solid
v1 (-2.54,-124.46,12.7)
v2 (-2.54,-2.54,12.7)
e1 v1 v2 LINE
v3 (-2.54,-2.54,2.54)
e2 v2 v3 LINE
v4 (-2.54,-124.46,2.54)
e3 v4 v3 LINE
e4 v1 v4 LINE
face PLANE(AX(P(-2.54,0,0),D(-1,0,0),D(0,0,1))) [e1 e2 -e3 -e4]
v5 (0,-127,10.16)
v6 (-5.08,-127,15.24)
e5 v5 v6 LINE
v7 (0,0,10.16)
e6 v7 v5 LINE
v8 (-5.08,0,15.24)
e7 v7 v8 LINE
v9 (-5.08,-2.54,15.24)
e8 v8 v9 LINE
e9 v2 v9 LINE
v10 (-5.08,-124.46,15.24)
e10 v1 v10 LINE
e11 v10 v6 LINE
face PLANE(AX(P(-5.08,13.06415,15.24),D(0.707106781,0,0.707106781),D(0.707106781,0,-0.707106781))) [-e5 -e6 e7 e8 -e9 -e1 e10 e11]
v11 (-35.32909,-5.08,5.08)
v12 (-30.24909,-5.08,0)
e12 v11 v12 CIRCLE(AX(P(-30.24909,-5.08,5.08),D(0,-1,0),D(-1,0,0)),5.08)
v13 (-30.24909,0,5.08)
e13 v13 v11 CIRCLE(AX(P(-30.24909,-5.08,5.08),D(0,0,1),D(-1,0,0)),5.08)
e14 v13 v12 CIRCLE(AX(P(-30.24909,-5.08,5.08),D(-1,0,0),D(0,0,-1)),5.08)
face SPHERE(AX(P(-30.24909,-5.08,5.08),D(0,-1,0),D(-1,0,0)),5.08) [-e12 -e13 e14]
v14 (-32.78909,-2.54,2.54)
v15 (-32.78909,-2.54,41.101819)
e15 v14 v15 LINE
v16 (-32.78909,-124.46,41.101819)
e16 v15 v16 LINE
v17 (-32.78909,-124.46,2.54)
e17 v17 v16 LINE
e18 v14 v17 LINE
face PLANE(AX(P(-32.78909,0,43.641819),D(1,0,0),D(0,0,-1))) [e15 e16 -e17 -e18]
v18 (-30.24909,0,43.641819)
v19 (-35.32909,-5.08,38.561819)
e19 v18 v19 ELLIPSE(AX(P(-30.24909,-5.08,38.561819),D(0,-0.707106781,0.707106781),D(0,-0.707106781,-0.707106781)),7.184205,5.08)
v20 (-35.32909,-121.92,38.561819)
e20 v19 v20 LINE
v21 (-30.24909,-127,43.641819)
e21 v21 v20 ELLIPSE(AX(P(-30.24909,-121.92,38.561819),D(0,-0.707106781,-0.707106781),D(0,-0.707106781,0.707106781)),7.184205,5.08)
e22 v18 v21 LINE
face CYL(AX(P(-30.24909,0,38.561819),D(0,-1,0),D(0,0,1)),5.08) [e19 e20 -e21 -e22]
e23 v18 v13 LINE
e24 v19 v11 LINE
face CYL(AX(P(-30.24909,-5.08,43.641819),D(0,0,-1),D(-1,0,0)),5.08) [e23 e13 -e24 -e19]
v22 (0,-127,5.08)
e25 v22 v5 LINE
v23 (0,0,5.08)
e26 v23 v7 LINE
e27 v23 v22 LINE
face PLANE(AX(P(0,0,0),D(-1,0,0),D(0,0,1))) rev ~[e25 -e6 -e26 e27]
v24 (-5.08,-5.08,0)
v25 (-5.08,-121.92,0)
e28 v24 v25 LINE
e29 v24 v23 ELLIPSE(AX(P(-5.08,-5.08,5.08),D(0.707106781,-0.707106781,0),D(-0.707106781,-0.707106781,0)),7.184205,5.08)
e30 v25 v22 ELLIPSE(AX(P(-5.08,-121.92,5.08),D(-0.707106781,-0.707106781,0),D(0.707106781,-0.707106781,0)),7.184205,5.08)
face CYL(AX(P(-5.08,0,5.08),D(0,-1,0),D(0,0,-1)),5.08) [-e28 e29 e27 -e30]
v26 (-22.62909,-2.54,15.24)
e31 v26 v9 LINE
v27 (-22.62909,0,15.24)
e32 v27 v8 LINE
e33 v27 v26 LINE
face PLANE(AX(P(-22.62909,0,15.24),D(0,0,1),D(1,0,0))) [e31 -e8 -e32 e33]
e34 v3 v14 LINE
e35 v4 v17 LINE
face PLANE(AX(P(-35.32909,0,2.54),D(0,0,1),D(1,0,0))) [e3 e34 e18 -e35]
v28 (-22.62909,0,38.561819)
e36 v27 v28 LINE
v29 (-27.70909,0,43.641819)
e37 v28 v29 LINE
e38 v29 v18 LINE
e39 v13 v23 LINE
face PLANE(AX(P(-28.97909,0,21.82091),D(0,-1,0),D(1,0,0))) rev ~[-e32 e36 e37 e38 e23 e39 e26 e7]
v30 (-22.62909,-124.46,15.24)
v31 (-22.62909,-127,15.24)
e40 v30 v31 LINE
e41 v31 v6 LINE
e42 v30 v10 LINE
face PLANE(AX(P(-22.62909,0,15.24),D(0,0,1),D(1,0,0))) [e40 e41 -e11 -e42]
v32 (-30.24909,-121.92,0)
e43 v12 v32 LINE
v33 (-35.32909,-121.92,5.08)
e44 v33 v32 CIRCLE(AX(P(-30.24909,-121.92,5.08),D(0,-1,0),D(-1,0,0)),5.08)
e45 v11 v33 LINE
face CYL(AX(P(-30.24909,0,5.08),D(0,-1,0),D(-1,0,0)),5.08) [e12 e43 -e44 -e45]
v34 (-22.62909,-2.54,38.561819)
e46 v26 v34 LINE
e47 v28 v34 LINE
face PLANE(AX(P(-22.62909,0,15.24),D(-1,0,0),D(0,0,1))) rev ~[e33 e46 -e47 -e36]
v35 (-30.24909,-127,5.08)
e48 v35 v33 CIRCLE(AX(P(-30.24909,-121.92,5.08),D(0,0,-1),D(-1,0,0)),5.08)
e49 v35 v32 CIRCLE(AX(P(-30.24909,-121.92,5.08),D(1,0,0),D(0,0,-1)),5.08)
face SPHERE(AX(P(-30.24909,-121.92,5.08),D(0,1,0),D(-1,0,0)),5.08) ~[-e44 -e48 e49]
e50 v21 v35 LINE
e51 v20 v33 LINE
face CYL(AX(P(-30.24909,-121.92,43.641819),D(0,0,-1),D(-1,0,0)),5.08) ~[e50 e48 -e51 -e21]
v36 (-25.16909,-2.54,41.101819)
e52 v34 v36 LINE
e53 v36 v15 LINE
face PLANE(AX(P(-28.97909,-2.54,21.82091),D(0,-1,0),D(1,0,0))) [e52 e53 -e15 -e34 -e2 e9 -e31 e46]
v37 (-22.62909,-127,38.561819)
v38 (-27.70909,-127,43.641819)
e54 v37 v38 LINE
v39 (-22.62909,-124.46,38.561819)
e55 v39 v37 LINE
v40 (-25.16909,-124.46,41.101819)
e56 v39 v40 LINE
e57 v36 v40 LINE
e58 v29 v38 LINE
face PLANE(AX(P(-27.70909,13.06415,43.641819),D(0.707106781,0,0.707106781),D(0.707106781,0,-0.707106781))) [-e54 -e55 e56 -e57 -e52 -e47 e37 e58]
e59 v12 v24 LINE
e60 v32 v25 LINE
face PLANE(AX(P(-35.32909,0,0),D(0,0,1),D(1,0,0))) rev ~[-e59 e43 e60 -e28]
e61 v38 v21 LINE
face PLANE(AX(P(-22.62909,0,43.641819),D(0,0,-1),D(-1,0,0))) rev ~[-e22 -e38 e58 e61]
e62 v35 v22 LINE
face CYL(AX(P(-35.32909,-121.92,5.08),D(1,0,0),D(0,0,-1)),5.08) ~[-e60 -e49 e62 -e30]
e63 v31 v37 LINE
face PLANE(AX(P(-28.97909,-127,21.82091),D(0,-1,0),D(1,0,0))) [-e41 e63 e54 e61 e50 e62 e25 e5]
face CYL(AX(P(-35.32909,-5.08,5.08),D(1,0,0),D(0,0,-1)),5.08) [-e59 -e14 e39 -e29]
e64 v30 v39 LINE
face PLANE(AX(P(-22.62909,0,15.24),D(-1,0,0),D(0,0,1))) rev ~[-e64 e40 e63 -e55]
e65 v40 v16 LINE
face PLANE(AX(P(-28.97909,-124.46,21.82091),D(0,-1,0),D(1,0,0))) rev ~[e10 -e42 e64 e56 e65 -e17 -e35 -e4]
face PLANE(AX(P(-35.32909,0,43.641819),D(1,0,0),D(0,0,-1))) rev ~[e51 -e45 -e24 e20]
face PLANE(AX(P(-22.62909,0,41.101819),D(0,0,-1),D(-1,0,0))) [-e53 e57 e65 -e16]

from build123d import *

# Parameters (mm, degrees)
F0_W        = 22.6290904153
F0_H        = 15.2400004526
F1_DEPTH    = 127
F2_T        = -2.54
F3_R        = 5.08
F4_T1_DEPTH = 153.1282991577


# Not quite as in the source:
# - a fillet or chamfer that OpenCascade refuses, or shapes differently, is made with other operations: its cross-section is extruded or revolved along the edge and cut away or added


with BuildPart() as f1:
    # F0 (on Front) → F1 (new body)
    with BuildSketch(Plane.XZ):
        Polygon((-22.6290904153, 0), (-22.6290904153, 15.2400004526), (-22.6290904153, 43.6418191694), (-35.3290904153, 43.6418191694), (-35.3290904153, 0), align=None)
        with Locations((-11.3145452077, 7.6200002263)):
            Rectangle(F0_W, F0_H)
    extrude(amount=F1_DEPTH)

    # F2
    f2_openings = [f1.faces().sort_by_distance(p)[0] for p in [
        (-22.62909, -63.5, 29.44091),
        (-11.314545, -63.5, 15.24),
    ]]
    offset(amount=F2_T, openings=f2_openings)

    # F3
    f3_edges = [f1.edges().sort_by_distance(p)[0] for p in [
        (-35.32909, -63.5, 43.641819),
        (0, -63.5, 0),
        (-35.32909, -63.5, 0),
        (-35.32909, 0, 21.82091),
        (-35.32909, -127, 21.82091),
        (-17.664545, -127, 0),
        (-17.664545, 0, 0),
    ]]
    fillet(f3_edges, radius=F3_R)

    # F4: chamfer of 5.08 on 2 edges, made by hand

    # F4_s2 → F4_t1 (cut)
    with BuildSketch(Plane.XZ.offset(-13.0641495789)):
        Polygon((-27.7090904153, 43.6418191694), (-22.6290904153, 38.5618191694), (-22.6290904153, 43.6418191694), align=None)
        Polygon((-5.08, 15.2400004526), (0, 10.1600004526), (0, 15.2400004526), align=None)
    extrude(amount=F4_T1_DEPTH, mode=Mode.SUBTRACT)


solid = f1.part
